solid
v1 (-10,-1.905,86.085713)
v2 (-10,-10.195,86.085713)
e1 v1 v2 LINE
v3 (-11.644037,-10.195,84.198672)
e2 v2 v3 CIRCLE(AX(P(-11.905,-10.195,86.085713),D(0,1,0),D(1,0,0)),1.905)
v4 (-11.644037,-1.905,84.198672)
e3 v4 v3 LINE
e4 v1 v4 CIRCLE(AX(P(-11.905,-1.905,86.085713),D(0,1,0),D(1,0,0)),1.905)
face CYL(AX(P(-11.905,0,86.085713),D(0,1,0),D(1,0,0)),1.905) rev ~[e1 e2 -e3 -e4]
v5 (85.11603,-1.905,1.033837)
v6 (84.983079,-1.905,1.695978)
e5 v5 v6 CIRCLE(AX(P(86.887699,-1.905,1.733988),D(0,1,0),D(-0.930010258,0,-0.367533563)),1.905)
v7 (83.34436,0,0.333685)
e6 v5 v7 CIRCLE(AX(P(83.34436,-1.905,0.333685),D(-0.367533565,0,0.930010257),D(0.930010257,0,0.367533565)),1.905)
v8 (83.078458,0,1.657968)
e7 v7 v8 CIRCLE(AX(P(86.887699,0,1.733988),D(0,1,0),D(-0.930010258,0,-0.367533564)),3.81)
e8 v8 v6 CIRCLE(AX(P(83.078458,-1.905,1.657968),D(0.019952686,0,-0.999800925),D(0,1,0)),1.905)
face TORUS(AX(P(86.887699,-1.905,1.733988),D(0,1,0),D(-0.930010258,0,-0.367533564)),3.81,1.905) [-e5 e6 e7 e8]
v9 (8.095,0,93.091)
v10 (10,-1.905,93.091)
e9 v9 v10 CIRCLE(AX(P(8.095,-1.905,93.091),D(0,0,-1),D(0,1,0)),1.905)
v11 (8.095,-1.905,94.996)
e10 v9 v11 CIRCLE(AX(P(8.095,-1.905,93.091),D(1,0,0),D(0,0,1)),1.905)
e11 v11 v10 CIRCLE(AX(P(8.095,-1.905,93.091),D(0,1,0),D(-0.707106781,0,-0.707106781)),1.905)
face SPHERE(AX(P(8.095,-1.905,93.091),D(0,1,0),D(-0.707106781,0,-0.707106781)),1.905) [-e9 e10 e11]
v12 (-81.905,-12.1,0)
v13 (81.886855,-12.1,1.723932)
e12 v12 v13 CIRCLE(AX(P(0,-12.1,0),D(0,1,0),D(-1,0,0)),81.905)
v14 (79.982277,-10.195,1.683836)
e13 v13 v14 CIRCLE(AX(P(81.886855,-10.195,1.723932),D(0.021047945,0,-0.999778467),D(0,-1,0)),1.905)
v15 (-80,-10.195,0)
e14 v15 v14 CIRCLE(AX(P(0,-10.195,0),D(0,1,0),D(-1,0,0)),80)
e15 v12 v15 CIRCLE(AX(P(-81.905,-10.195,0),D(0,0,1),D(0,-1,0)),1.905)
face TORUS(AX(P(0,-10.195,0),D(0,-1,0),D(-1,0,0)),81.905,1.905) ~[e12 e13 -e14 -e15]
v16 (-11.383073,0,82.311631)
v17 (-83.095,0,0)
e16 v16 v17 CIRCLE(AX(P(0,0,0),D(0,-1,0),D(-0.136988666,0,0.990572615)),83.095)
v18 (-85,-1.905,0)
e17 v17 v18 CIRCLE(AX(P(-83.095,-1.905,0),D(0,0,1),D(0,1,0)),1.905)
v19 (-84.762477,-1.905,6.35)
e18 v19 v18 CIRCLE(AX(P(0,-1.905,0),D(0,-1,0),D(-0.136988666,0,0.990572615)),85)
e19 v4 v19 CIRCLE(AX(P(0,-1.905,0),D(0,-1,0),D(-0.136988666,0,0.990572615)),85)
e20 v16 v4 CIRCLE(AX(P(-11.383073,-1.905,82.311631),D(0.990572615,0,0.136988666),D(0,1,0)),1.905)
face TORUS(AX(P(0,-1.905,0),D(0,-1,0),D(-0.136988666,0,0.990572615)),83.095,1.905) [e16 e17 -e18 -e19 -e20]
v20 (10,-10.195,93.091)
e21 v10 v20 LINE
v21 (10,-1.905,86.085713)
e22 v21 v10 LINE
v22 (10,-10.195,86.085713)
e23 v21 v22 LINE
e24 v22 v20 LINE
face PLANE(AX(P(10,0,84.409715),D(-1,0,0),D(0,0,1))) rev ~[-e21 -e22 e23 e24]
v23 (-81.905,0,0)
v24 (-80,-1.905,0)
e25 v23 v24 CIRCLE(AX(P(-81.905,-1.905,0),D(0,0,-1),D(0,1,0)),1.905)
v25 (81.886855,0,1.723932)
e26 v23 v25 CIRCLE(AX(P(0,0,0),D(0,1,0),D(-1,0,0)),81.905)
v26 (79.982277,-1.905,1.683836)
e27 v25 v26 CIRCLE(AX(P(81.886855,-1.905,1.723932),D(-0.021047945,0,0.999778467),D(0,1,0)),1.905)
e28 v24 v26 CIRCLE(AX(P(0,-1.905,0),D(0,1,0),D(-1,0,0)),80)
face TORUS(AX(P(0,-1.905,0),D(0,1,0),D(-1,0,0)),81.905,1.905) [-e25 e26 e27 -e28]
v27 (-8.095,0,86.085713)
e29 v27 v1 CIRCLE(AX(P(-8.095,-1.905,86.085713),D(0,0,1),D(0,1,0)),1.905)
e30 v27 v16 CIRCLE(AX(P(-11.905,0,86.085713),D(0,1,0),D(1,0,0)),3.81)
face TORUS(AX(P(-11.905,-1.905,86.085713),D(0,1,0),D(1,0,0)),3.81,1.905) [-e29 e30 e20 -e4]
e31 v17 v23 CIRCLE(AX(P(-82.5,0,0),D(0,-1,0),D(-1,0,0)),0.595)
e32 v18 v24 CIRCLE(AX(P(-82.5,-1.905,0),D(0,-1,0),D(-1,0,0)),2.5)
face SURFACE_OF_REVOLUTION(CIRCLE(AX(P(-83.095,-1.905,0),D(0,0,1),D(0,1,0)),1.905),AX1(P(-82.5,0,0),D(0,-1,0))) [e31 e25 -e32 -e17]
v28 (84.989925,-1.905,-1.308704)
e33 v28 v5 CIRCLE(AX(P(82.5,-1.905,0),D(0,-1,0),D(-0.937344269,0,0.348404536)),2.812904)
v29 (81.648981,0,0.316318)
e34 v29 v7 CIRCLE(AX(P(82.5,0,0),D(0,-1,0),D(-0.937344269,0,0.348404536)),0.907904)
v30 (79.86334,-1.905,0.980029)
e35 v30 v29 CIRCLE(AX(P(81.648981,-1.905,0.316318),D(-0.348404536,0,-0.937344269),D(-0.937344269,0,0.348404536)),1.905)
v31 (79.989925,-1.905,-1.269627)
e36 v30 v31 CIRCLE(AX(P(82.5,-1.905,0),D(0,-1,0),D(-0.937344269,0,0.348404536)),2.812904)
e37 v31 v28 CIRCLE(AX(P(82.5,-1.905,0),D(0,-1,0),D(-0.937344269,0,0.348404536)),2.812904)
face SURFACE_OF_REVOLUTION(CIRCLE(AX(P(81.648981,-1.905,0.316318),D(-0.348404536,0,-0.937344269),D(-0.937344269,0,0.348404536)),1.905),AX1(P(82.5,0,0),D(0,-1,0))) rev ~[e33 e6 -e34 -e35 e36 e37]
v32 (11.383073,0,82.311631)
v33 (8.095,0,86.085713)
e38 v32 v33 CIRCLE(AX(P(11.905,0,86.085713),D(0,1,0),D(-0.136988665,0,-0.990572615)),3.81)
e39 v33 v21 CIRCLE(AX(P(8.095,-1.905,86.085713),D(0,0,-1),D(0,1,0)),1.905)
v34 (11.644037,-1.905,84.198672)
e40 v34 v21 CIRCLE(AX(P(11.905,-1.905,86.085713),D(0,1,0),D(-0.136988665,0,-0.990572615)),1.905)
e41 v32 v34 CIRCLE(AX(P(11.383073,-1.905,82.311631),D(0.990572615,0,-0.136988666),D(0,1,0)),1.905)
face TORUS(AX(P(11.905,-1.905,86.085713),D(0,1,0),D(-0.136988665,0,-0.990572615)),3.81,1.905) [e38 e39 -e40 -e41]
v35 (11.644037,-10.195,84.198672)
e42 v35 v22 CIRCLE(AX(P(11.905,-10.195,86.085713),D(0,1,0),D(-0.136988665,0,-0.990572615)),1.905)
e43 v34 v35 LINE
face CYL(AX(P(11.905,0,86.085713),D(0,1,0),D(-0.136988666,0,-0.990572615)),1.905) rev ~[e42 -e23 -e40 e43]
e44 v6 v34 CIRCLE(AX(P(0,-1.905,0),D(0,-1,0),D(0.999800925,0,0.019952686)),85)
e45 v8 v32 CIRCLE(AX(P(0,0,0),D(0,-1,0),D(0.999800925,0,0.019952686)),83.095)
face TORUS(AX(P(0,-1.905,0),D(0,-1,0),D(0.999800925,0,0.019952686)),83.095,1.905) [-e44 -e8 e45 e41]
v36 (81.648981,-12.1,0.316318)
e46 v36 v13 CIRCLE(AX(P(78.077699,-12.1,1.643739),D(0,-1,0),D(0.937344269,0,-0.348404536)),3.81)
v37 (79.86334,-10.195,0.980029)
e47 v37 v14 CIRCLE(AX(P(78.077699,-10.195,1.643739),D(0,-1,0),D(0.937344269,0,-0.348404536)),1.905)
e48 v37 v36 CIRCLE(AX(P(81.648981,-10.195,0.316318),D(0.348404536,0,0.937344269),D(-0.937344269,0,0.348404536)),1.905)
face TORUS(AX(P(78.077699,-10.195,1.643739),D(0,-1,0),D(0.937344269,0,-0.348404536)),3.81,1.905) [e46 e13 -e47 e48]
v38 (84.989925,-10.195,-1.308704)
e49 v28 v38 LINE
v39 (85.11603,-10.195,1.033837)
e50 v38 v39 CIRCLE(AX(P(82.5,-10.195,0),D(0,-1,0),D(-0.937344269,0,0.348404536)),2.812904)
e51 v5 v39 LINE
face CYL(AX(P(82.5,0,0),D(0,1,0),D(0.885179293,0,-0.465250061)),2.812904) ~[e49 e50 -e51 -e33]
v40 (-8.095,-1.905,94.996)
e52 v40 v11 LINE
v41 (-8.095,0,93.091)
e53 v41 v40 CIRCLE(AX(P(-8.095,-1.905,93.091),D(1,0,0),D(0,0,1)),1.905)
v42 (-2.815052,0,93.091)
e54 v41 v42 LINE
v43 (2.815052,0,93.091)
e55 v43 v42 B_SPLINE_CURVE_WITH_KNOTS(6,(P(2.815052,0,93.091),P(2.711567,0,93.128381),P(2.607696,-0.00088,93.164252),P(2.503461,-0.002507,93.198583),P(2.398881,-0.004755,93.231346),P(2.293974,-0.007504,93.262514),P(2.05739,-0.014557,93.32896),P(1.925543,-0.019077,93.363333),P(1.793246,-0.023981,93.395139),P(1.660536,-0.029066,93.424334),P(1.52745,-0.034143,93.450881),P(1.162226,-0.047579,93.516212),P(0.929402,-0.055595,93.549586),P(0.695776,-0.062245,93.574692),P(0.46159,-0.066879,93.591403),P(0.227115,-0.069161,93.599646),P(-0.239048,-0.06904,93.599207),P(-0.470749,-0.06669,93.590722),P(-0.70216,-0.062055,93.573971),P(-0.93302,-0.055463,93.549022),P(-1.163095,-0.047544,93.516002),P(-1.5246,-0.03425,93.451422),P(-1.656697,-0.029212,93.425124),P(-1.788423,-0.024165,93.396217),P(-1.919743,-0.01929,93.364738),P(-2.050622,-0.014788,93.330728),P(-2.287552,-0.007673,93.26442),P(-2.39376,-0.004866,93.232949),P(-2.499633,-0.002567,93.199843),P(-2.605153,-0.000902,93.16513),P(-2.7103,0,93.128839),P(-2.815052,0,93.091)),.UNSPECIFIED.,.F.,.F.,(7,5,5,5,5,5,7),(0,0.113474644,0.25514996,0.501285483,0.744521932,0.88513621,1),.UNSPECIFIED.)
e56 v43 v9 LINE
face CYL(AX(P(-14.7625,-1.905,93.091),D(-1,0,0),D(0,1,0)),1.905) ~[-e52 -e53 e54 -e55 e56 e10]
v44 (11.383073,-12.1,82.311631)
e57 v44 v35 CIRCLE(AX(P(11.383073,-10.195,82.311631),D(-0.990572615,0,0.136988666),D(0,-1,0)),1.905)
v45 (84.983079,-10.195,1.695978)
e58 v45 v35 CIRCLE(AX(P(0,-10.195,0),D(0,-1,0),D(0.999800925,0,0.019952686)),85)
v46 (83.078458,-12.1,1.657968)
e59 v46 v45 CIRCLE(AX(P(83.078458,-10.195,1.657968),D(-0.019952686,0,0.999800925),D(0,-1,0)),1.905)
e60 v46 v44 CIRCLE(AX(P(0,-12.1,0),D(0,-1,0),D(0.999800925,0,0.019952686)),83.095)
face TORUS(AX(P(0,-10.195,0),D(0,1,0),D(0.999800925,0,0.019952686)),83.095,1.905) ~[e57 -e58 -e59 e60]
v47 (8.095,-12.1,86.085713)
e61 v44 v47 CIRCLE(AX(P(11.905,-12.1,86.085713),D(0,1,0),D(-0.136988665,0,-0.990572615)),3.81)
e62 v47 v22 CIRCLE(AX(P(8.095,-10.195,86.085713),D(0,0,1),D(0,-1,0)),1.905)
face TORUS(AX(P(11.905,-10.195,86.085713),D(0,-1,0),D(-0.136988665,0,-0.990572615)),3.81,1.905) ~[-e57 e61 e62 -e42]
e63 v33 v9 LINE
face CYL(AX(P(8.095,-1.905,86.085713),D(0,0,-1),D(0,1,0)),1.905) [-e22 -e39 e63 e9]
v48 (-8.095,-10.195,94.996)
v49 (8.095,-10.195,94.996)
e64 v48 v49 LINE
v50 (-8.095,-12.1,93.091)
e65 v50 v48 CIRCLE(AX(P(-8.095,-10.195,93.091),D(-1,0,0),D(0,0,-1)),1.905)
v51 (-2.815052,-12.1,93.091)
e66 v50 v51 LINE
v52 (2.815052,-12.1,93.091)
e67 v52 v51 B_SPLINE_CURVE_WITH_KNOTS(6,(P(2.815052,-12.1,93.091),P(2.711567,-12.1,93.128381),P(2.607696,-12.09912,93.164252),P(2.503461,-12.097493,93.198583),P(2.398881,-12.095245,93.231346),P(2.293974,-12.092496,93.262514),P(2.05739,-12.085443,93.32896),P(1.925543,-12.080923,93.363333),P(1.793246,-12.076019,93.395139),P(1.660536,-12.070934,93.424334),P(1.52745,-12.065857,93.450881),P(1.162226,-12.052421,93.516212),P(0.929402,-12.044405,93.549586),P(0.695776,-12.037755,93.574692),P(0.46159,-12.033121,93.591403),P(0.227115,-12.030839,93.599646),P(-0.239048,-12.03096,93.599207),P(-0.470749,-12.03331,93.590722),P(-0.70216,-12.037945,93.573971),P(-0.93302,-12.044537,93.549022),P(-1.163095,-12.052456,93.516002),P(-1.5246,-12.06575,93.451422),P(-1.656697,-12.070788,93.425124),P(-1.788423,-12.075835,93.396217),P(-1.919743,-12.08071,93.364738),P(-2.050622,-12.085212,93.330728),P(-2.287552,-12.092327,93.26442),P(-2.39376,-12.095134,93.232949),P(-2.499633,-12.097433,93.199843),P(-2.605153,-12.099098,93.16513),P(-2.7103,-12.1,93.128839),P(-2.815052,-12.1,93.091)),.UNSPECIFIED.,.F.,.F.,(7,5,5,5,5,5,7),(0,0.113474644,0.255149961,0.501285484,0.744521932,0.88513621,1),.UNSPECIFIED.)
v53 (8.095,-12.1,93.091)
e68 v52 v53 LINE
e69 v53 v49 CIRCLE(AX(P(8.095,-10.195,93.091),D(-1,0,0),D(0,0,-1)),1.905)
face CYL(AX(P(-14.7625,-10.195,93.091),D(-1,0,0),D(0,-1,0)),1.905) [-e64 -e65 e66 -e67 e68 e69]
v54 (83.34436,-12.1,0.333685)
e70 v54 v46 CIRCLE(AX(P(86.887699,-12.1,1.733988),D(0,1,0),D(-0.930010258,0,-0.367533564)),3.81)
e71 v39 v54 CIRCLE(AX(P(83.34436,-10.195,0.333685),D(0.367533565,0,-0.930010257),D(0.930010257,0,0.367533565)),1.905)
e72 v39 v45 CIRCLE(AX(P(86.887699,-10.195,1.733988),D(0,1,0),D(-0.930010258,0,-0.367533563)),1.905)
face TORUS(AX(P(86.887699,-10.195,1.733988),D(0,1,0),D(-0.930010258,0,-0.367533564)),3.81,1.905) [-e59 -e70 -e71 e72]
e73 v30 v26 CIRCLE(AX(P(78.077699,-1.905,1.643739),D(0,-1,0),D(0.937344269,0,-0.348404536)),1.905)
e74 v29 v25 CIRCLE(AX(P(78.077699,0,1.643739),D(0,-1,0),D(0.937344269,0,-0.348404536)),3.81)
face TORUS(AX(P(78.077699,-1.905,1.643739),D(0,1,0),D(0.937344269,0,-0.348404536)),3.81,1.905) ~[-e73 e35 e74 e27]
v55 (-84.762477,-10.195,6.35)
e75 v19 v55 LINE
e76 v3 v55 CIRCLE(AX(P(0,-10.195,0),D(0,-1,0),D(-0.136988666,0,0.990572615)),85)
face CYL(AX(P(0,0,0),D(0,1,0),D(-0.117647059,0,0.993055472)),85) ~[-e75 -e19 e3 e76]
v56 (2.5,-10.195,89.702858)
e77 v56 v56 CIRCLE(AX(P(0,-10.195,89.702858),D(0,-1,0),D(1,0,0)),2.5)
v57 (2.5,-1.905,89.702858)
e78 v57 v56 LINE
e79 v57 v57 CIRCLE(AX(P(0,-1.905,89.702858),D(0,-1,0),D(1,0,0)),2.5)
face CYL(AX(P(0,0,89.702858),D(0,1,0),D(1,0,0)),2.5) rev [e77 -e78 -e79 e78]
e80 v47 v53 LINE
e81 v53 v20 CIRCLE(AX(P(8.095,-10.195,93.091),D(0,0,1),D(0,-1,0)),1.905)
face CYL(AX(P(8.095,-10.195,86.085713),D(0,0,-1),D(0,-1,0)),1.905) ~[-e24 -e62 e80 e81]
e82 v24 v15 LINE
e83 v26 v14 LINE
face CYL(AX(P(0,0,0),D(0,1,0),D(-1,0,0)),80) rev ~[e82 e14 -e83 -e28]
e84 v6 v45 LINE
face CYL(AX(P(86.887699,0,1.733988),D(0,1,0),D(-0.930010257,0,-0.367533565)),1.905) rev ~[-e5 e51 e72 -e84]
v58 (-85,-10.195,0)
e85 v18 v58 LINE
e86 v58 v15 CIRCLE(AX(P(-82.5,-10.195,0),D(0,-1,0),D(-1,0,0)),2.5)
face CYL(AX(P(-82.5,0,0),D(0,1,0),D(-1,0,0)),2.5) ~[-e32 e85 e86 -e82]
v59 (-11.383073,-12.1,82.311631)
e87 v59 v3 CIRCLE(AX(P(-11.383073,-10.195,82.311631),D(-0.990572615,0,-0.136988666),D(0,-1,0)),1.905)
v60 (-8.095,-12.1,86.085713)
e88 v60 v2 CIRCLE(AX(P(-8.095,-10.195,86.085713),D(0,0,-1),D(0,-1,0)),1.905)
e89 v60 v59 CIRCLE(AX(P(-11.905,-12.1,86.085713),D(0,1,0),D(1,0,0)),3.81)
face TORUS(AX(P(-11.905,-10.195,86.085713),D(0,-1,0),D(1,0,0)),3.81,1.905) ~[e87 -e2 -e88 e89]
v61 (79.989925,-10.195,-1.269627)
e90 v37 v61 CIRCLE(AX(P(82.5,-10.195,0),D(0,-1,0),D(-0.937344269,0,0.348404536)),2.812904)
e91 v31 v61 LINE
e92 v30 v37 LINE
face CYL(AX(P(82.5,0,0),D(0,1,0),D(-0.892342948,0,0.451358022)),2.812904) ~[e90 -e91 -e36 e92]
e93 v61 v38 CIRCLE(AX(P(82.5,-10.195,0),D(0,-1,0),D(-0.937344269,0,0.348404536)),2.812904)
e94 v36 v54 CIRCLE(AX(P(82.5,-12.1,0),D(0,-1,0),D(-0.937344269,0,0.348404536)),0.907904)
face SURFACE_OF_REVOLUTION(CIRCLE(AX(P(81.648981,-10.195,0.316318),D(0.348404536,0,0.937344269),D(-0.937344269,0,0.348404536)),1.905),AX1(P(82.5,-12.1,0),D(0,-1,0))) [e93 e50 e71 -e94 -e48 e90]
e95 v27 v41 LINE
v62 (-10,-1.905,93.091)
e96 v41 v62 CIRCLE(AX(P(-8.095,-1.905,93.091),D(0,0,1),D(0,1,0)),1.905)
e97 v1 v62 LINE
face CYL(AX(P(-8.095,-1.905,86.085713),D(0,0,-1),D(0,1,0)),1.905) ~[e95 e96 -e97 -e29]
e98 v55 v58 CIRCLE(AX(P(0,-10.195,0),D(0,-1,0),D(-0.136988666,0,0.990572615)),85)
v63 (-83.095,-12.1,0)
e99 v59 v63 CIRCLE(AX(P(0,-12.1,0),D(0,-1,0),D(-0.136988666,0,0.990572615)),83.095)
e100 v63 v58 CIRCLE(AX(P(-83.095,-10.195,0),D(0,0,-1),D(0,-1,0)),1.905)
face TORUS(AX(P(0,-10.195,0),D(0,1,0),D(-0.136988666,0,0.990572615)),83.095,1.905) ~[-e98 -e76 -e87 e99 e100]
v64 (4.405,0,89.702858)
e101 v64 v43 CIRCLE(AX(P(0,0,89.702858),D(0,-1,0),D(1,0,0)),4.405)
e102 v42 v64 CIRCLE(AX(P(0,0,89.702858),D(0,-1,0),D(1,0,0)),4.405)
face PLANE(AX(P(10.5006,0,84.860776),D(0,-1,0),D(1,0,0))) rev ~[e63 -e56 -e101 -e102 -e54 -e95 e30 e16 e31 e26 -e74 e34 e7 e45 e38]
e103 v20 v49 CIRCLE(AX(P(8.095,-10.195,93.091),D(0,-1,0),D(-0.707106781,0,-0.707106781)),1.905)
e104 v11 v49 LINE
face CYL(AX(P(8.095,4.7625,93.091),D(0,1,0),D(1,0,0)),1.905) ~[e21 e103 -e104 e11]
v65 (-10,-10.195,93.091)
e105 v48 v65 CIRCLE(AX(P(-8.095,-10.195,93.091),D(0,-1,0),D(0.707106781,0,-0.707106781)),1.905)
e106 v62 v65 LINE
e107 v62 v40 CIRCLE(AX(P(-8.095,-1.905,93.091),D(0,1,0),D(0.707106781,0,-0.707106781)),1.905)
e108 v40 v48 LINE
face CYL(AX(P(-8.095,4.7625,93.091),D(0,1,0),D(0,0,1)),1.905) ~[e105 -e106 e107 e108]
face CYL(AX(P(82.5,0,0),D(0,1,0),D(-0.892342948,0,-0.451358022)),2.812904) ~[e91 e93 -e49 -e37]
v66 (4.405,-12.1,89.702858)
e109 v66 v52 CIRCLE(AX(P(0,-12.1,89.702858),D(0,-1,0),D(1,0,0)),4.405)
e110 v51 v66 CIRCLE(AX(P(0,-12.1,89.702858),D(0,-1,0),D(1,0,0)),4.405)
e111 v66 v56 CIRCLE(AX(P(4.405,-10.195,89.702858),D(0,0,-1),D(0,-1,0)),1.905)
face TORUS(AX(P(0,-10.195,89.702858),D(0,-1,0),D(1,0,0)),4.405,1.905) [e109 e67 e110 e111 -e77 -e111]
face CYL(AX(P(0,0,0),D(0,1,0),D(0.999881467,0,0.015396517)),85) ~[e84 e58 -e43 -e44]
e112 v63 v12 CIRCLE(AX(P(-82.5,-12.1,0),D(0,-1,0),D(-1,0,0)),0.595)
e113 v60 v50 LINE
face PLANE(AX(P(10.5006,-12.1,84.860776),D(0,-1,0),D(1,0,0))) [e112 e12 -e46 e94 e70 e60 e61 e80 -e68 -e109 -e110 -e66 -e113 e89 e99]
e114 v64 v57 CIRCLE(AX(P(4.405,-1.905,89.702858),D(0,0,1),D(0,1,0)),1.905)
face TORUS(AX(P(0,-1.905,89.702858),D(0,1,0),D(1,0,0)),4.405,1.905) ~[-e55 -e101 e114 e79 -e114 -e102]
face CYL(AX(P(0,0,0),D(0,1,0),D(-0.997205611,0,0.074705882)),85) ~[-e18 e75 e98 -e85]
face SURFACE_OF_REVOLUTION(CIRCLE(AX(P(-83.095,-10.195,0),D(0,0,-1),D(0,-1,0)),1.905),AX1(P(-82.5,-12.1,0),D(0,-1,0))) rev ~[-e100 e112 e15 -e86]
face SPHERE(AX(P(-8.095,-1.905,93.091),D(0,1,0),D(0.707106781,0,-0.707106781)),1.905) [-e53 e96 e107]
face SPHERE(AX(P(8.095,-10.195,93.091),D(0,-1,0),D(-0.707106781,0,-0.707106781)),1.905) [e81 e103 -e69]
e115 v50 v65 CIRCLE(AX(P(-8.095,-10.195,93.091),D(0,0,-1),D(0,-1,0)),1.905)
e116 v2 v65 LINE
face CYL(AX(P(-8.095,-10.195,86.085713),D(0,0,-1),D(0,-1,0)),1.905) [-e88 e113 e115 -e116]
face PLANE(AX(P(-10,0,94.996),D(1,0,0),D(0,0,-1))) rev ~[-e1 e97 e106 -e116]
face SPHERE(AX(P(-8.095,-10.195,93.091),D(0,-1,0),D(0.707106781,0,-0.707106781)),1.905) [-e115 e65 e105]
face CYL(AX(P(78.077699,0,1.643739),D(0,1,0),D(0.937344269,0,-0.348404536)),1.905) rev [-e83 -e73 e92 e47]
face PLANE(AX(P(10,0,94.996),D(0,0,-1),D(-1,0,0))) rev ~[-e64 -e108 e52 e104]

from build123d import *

# Parameters (mm, degrees)
F0_R         = 2.5
F1_DEPTH     = 12.1
F2_T1_DEPTH  = 12.1
F2_T3_DEPTH  = 21.625
F2_T5_DEPTH  = 29.525
F2_T11_DEPTH = 7.0052868996
F2_S15_W     = 1.905
F2_S15_H     = 1.905
F2_T16_DEPTH = 1.905
F2_S21_W     = 1.905
F2_S21_H     = 1.905
F2_T22_DEPTH = 1.905
F2_S27_W     = 1.905
F2_S27_H     = 1.905
F2_T28_DEPTH = 1.905
F2_S33_W     = 1.905
F2_S33_H     = 1.905
F2_T34_DEPTH = 1.905
F2_T38_ANGLE = 82.1263694415
F2_T40_ANGLE = 221.9533464531
F2_T42_ANGLE = 221.9533464531
F2_T44_ANGLE = 80.9830888649
F2_T46_ANGLE = 178.7939525204
F2_T48_ANGLE = 82.1263694415
F2_T50_ANGLE = 180
F2_T52_ANGLE = 180
F2_T54_ANGLE = 80.9830888649
F2_T56_ANGLE = 178.7939525204
F2_T58_ANGLE = 21.5958079127
F2_T60_ANGLE = 20.4203054434
F2_T62_ANGLE = 82.1263694415
F2_T64_ANGLE = 82.1263694415
F2_T66_ANGLE = 82.1263694415
F2_T68_ANGLE = 21.5958079127
F2_T70_ANGLE = 20.4203054434
F2_T72_ANGLE = 82.1263694415


# Not quite as in the source:
# - a fillet or chamfer that OpenCascade refuses, or shapes differently, is made with other operations: its cross-section is extruded or revolved along the edge and cut away or added


with BuildPart() as f1:
    # F0 (on Front) → F1 (new body)
    with BuildSketch(Plane.XZ):
        with BuildLine():
            ThreePointArc((79.9899246621, 1.2696269321), (79.6870956738, 0), (79.9899246621, -1.2696269321))
            ThreePointArc((79.9899246621, -1.2696269321), (80, 0), (79.9899246621, 1.2696269321))
        make_face()
        with BuildLine():
            ThreePointArc((84.9899246621, 1.3087039105), (85, 0), (84.9899246621, -1.3087039105))
            ThreePointArc((84.9899246621, -1.3087039105), (85.3129043262, 0), (84.9899246621, 1.3087039105))
        make_face()
        with BuildLine():
            ThreePointArc((79.9899246621, 1.2696269321), (80, 0), (79.9899246621, -1.2696269321))
            ThreePointArc((79.9899246621, -1.2696269321), (82.478016711, -2.8128184235), (84.9899246621, -1.3087039105))
            ThreePointArc((84.9899246621, -1.3087039105), (85, 0), (84.9899246621, 1.3087039105))
            ThreePointArc((84.9899246621, 1.3087039105), (63.1048014117, 56.9454479199), (10, 84.4097150807))
            Line((10, 84.4097150807), (10, 94.996))
            Line((10, 94.996), (-10, 94.996))
            Line((-10, 94.996), (-10, 84.4097150807))
            ThreePointArc((-10, 84.4097150807), (-61.386574586, 58.7936090115), (-84.7624769577, 6.35))
            ThreePointArc((-84.7624769577, 6.35), (-84.9405984833, 3.177220373), (-85, 0))
            ThreePointArc((-85, 0), (-82.5, -2.5), (-80, 0))
            ThreePointArc((-80, 0), (-0.6348334544, 79.9974811259), (79.9899246621, 1.2696269321))
        make_face()
        with Locations((0, 89.7028575403)):
            Circle(F0_R, mode=Mode.SUBTRACT)
    extrude(amount=F1_DEPTH)

    # F2: fillet of radius 1.905 on 27 edges, made by hand

    # F2_s2 → F2_t1 (join)
    with BuildSketch(Plane.XZ):
        with BuildLine():
            ThreePointArc((11.6440365917, 84.1986722689), (10.4686573715, 84.8343359176), (10, 86.0857131004))
            Line((10, 86.0857131004), (10, 84.4097150807))
            ThreePointArc((10, 84.4097150807), (10.8225327333, 84.3082011742), (11.6440365917, 84.1986722689))
        make_face()
        with BuildLine():
            ThreePointArc((79.8633402498, 0.9800286271), (79.9560670028, 1.3263117777), (79.9822773973, 1.6838356039))
            ThreePointArc((79.9822773973, 1.6838356039), (79.9863691521, 1.4767362182), (79.9899246621, 1.2696269321))
            ThreePointArc((79.9899246621, 1.2696269321), (79.9225618705, 1.1266070465), (79.8633402498, 0.9800286271))
        make_face()
        with BuildLine():
            ThreePointArc((85.1160298765, 1.0338367541), (85.0199774182, 1.3589688139), (84.983078654, 1.6959783275))
            ThreePointArc((84.983078654, 1.6959783275), (84.9867222538, 1.5023450186), (84.9899246621, 1.3087039105))
            ThreePointArc((84.9899246621, 1.3087039105), (85.0566738012, 1.1729662496), (85.1160298765, 1.0338367541))
        make_face()
        with BuildLine():
            ThreePointArc((-10, 86.0857131004), (-10.4686573715, 84.8343359176), (-11.6440365917, 84.1986722689))
            ThreePointArc((-11.6440365917, 84.1986722689), (-10.8225327333, 84.3082011742), (-10, 84.4097150807))
            Line((-10, 84.4097150807), (-10, 86.0857131004))
        make_face()
    extrude(amount=F2_T1_DEPTH)

    # F2_s4 → F2_t3 (cut)
    with BuildSketch(Plane.XZ.offset(-4.7625)):
        with BuildLine():
            ThreePointArc((10, 93.091), (9.4420384182, 94.4380384182), (8.095, 94.996))
            Line((8.095, 94.996), (10, 94.996))
            Line((10, 94.996), (10, 93.091))
        make_face()
        with BuildLine():
            ThreePointArc((-8.095, 94.996), (-9.4420384182, 94.4380384182), (-10, 93.091))
            Line((-10, 93.091), (-10, 94.996))
            Line((-10, 94.996), (-8.095, 94.996))
        make_face()
    extrude(amount=F2_T3_DEPTH, mode=Mode.SUBTRACT)

    # F2_s6 → F2_t5 (cut)
    with BuildSketch(Plane.YZ.offset(-14.7625)):
        with BuildLine():
            ThreePointArc((0, 93.091), (-0.5579615818, 94.4380384182), (-1.905, 94.996))
            Line((-1.905, 94.996), (0, 94.996))
            Line((0, 94.996), (0, 93.091))
        make_face()
        with BuildLine():
            ThreePointArc((-12.1, 93.091), (-11.5420384182, 94.4380384182), (-10.195, 94.996))
            Line((-10.195, 94.996), (-12.1, 94.996))
            Line((-12.1, 94.996), (-12.1, 93.091))
        make_face()
    extrude(amount=F2_T5_DEPTH, mode=Mode.SUBTRACT)

    # F2_s7 → F2_t8 (revolve, cut)
    with BuildSketch(Plane.XY.offset(89.7028575403)):
        with BuildLine():
            ThreePointArc((4.405, -12.1), (3.0579615818, -11.5420384182), (2.5, -10.195))
            Line((2.5, -10.195), (2.5, -12.1))
            Line((2.5, -12.1), (4.405, -12.1))
        make_face()
    revolve(axis=Axis((0, -12.1, 89.7028575403), (0, -1, 0)), mode=Mode.SUBTRACT)

    # F2_s9 → F2_t10 (revolve, cut)
    with BuildSketch(Plane.XY.offset(89.7028575403)):
        with BuildLine():
            ThreePointArc((4.405, 0), (3.0579615818, -0.5579615818), (2.5, -1.905))
            Line((2.5, -1.905), (2.5, 0))
            Line((2.5, 0), (4.405, 0))
        make_face()
    revolve(axis=Axis((0, 0, 89.7028575403), (0, -1, 0)), mode=Mode.SUBTRACT)

    # F2_s12 → F2_t11 (cut)
    with BuildSketch(Plane.XY.offset(86.0857131004)):
        with BuildLine():
            ThreePointArc((8.095, 0), (9.4420384182, -0.5579615818), (10, -1.905))
            Line((10, -1.905), (10, 0))
            Line((10, 0), (8.095, 0))
        make_face()
        with BuildLine():
            ThreePointArc((8.095, -12.1), (9.4420384182, -11.5420384182), (10, -10.195))
            Line((10, -10.195), (10, -12.1))
            Line((10, -12.1), (8.095, -12.1))
        make_face()
        with BuildLine():
            ThreePointArc((-8.095, 0), (-9.4420384182, -0.5579615818), (-10, -1.905))
            Line((-10, -1.905), (-10, 0))
            Line((-10, 0), (-8.095, 0))
        make_face()
        with BuildLine():
            ThreePointArc((-8.095, -12.1), (-9.4420384182, -11.5420384182), (-10, -10.195))
            Line((-10, -10.195), (-10, -12.1))
            Line((-10, -12.1), (-8.095, -12.1))
        make_face()
    extrude(amount=F2_T11_DEPTH, mode=Mode.SUBTRACT)


with BuildPart() as f2_tool14:
    # F2_s15 → F2_t16 (new body)
    with BuildSketch(Plane.XZ.offset(10.195)):
        with Locations((-9.0475, 94.0435)):
            Rectangle(F2_S15_W, F2_S15_H)
    extrude(amount=F2_T16_DEPTH)

    # F2_s17 → F2_t18 (revolve, cut)
    with BuildSketch(Plane(origin=(-8.095, -10.195, 93.091), x_dir=(0.7071067812, 0, -0.7071067812), z_dir=(-0.7071067812, 0, -0.7071067812))):
        with BuildLine():
            ThreePointArc((0, -1.905), (1.905, 0), (0, 1.905))
            Line((0, 1.905), (0, -1.905))
        make_face()
    revolve(axis=Axis((-8.095, -10.195, 93.091), (0, -1, 0)), mode=Mode.SUBTRACT)


with BuildPart() as f1_1:
    add(f1.part)

    # F2_t13: cut F2_tool14
    add(f2_tool14.part, mode=Mode.SUBTRACT)


with BuildPart() as f2_tool20:
    # F2_s21 → F2_t22 (new body)
    with BuildSketch(Plane.XZ.offset(1.905)):
        with Locations((-9.0475, 94.0435)):
            Rectangle(F2_S21_W, F2_S21_H)
    extrude(amount=-F2_T22_DEPTH)

    # F2_s23 → F2_t24 (revolve, cut)
    with BuildSketch(Plane(origin=(-8.095, -1.905, 93.091), x_dir=(0.7071067812, 0, -0.7071067812), z_dir=(0.7071067812, 0, 0.7071067812))):
        with BuildLine():
            ThreePointArc((0, -1.905), (1.905, 0), (0, 1.905))
            Line((0, 1.905), (0, -1.905))
        make_face()
    revolve(axis=Axis((-8.095, -1.905, 93.091), (0, 1, 0)), mode=Mode.SUBTRACT)


with BuildPart() as f1_2:
    add(f1_1.part)

    # F2_t19: cut F2_tool20
    add(f2_tool20.part, mode=Mode.SUBTRACT)


with BuildPart() as f2_tool26:
    # F2_s27 → F2_t28 (new body)
    with BuildSketch(Plane.XZ.offset(10.195)):
        with Locations((9.0475, 94.0435)):
            Rectangle(F2_S27_W, F2_S27_H)
    extrude(amount=F2_T28_DEPTH)

    # F2_s29 → F2_t30 (revolve, cut)
    with BuildSketch(Plane(origin=(8.095, -10.195, 93.091), x_dir=(-0.7071067812, 0, -0.7071067812), z_dir=(-0.7071067812, 0, 0.7071067812))):
        with BuildLine():
            ThreePointArc((0, -1.905), (1.905, 0), (0, 1.905))
            Line((0, 1.905), (0, -1.905))
        make_face()
    revolve(axis=Axis((8.095, -10.195, 93.091), (0, -1, 0)), mode=Mode.SUBTRACT)


with BuildPart() as f1_3:
    add(f1_2.part)

    # F2_t25: cut F2_tool26
    add(f2_tool26.part, mode=Mode.SUBTRACT)


with BuildPart() as f2_tool32:
    # F2_s33 → F2_t34 (new body)
    with BuildSketch(Plane.XZ.offset(1.905)):
        with Locations((9.0475, 94.0435)):
            Rectangle(F2_S33_W, F2_S33_H)
    extrude(amount=-F2_T34_DEPTH)

    # F2_s35 → F2_t36 (revolve, cut)
    with BuildSketch(Plane(origin=(8.095, -1.905, 93.091), x_dir=(-0.7071067812, 0, -0.7071067812), z_dir=(0.7071067812, 0, -0.7071067812))):
        with BuildLine():
            ThreePointArc((0, -1.905), (1.905, 0), (0, 1.905))
            Line((0, 1.905), (0, -1.905))
        make_face()
    revolve(axis=Axis((8.095, -1.905, 93.091), (0, 1, 0)), mode=Mode.SUBTRACT)


with BuildPart() as f1_4:
    add(f1_3.part)

    # F2_t31: cut F2_tool32
    add(f2_tool32.part, mode=Mode.SUBTRACT)

    # F2_s37 → F2_t38 (revolve, cut)
    with BuildSketch(Plane(origin=(0, 0, 0), x_dir=(0, 1, 0), z_dir=(0.9905726149, 0, 0.1369886658))):
        with BuildLine():
            ThreePointArc((-12.1, 83.095), (-11.5420384182, 84.4420384182), (-10.195, 85))
            Line((-10.195, 85), (-12.1, 85))
            Line((-12.1, 85), (-12.1, 83.095))
        make_face()
    revolve(axis=Axis((0, -12.1, 0), (0, -1, 0)), revolution_arc=F2_T38_ANGLE, mode=Mode.SUBTRACT)

    # F2_s39 → F2_t40 (revolve, cut)
    with BuildSketch(Plane(origin=(10.0143219694, 0, 26.9424371201), x_dir=(0, 1, 0), z_dir=(0.3484045362, 0, 0.9373442693))):
        with BuildLine():
            ThreePointArc((-1.905, -74.5179978897), (-0.5579615818, -75.0759594715), (0, -76.4229978897))
            Line((0, -76.4229978897), (0, -74.5179978897))
            Line((0, -74.5179978897), (-1.905, -74.5179978897))
        make_face()
    revolve(axis=Axis((82.5, 0, 0), (0, -1, 0)), revolution_arc=F2_T40_ANGLE, mode=Mode.SUBTRACT)

    # F2_s41 → F2_t42 (revolve, cut)
    with BuildSketch(Plane(origin=(10.0143219694, 0, 26.9424371201), x_dir=(0, 1, 0), z_dir=(0.3484045362, 0, 0.9373442693))):
        with BuildLine():
            ThreePointArc((-10.195, -74.5179978897), (-11.5420384182, -75.0759594715), (-12.1, -76.4229978897))
            Line((-12.1, -76.4229978897), (-12.1, -74.5179978897))
            Line((-12.1, -74.5179978897), (-10.195, -74.5179978897))
        make_face()
    revolve(axis=Axis((82.5, -12.1, 0), (0, -1, 0)), revolution_arc=F2_T42_ANGLE, mode=Mode.SUBTRACT)

    # F2_s43 → F2_t44 (revolve, cut)
    with BuildSketch(Plane(origin=(0, 0, 0), x_dir=(0, 1, 0), z_dir=(0.0199526862, 0, -0.9998009253))):
        with BuildLine():
            ThreePointArc((-12.1, 83.095), (-11.5420384182, 84.4420384182), (-10.195, 85))
            Line((-10.195, 85), (-12.1, 85))
            Line((-12.1, 85), (-12.1, 83.095))
        make_face()
    revolve(axis=Axis((0, -12.1, 0), (0, -1, 0)), revolution_arc=F2_T44_ANGLE, mode=Mode.SUBTRACT)

    # F2_s45 → F2_t46 (revolve, cut)
    with BuildSketch(Plane.XY):
        with BuildLine():
            ThreePointArc((-81.905, -12.1), (-80.5579615818, -11.5420384182), (-80, -10.195))
            Line((-80, -10.195), (-80, -12.1))
            Line((-80, -12.1), (-81.905, -12.1))
        make_face()
    revolve(axis=Axis((0, -12.1, 0), (0, 1, 0)), revolution_arc=F2_T46_ANGLE, mode=Mode.SUBTRACT)

    # F2_s47 → F2_t48 (revolve, cut)
    with BuildSketch(Plane(origin=(0, 0, 0), x_dir=(0, 1, 0), z_dir=(0.9905726149, 0, 0.1369886658))):
        with BuildLine():
            ThreePointArc((0, 83.095), (-0.5579615818, 84.4420384182), (-1.905, 85))
            Line((-1.905, 85), (0, 85))
            Line((0, 85), (0, 83.095))
        make_face()
    revolve(axis=Axis((0, 0, 0), (0, -1, 0)), revolution_arc=F2_T48_ANGLE, mode=Mode.SUBTRACT)

    # F2_s49 → F2_t50 (revolve, cut)
    with BuildSketch(Plane.XY):
        with BuildLine():
            ThreePointArc((-83.095, 0), (-84.4420384182, -0.5579615818), (-85, -1.905))
            Line((-85, -1.905), (-85, 0))
            Line((-85, 0), (-83.095, 0))
        make_face()
    revolve(axis=Axis((-82.5, 0, 0), (0, -1, 0)), revolution_arc=F2_T50_ANGLE, mode=Mode.SUBTRACT)

    # F2_s51 → F2_t52 (revolve, cut)
    with BuildSketch(Plane.XY):
        with BuildLine():
            ThreePointArc((-83.095, -12.1), (-84.4420384182, -11.5420384182), (-85, -10.195))
            Line((-85, -10.195), (-85, -12.1))
            Line((-85, -12.1), (-83.095, -12.1))
        make_face()
    revolve(axis=Axis((-82.5, -12.1, 0), (0, -1, 0)), revolution_arc=F2_T52_ANGLE, mode=Mode.SUBTRACT)

    # F2_s53 → F2_t54 (revolve, cut)
    with BuildSketch(Plane(origin=(0, 0, 0), x_dir=(0, 1, 0), z_dir=(0.0199526862, 0, -0.9998009253))):
        with BuildLine():
            ThreePointArc((0, 83.095), (-0.5579615818, 84.4420384182), (-1.905, 85))
            Line((-1.905, 85), (0, 85))
            Line((0, 85), (0, 83.095))
        make_face()
    revolve(axis=Axis((0, 0, 0), (0, -1, 0)), revolution_arc=F2_T54_ANGLE, mode=Mode.SUBTRACT)

    # F2_s55 → F2_t56 (revolve, cut)
    with BuildSketch(Plane.XY):
        with BuildLine():
            ThreePointArc((-81.905, 0), (-80.5579615818, -0.5579615818), (-80, -1.905))
            Line((-80, -1.905), (-80, 0))
            Line((-80, 0), (-81.905, 0))
        make_face()
    revolve(axis=Axis((0, 0, 0), (0, 1, 0)), revolution_arc=F2_T56_ANGLE, mode=Mode.SUBTRACT)

    # F2_s57 → F2_t58 (revolve, cut)
    with BuildSketch(Plane(origin=(10.0143219694, 0, 26.9424371201), x_dir=(0, 1, 0), z_dir=(-0.3484045362, 0, -0.9373442693))):
        with BuildLine():
            ThreePointArc((0, 76.4229978897), (-0.5579615818, 75.0759594715), (-1.905, 74.5179978897))
            Line((-1.905, 74.5179978897), (0, 74.5179978897))
            Line((0, 74.5179978897), (0, 76.4229978897))
        make_face()
    revolve(axis=Axis((78.0776994168, 0, 1.6437392686), (0, -1, 0)), revolution_arc=F2_T58_ANGLE, mode=Mode.SUBTRACT)

    # F2_s59 → F2_t60 (revolve, cut)
    with BuildSketch(Plane(origin=(11.1441759948, 0, -28.199323768), x_dir=(0, 1, 0), z_dir=(0.3675335647, 0, -0.9300102574))):
        with BuildLine():
            ThreePointArc((0, 77.6337505609), (-0.5579615818, 78.9807889791), (-1.905, 79.5387505609))
            Line((-1.905, 79.5387505609), (0, 79.5387505609))
            Line((0, 79.5387505609), (0, 77.6337505609))
        make_face()
    revolve(axis=Axis((86.8876994168, 0, 1.7339881947), (0, 1, 0)), revolution_arc=F2_T60_ANGLE, mode=Mode.SUBTRACT)

    # F2_s61 → F2_t62 (revolve, cut)
    with BuildSketch(Plane(origin=(0, 0, 0), x_dir=(0, 1, 0), z_dir=(0.9905726149, 0, -0.1369886658))):
        with BuildLine():
            ThreePointArc((0, 83.095), (-0.5579615818, 84.4420384182), (-1.905, 85))
            Line((-1.905, 85), (0, 85))
            Line((0, 85), (0, 83.095))
        make_face()
    revolve(axis=Axis((11.905, 0, 86.0857131004), (0, 1, 0)), revolution_arc=F2_T62_ANGLE, mode=Mode.SUBTRACT)

    # F2_s63 → F2_t64 (revolve, cut)
    with BuildSketch(Plane.XY.offset(86.0857131004)):
        with BuildLine():
            ThreePointArc((-8.095, -12.1), (-9.4420384182, -11.5420384182), (-10, -10.195))
            Line((-10, -10.195), (-10, -12.1))
            Line((-10, -12.1), (-8.095, -12.1))
        make_face()
    revolve(axis=Axis((-11.905, -12.1, 86.0857131004), (0, 1, 0)), revolution_arc=F2_T64_ANGLE, mode=Mode.SUBTRACT)

    # F2_s65 → F2_t66 (revolve, cut)
    with BuildSketch(Plane.XY.offset(86.0857131004)):
        with BuildLine():
            ThreePointArc((-8.095, 0), (-9.4420384182, -0.5579615818), (-10, -1.905))
            Line((-10, -1.905), (-10, 0))
            Line((-10, 0), (-8.095, 0))
        make_face()
    revolve(axis=Axis((-11.905, 0, 86.0857131004), (0, 1, 0)), revolution_arc=F2_T66_ANGLE, mode=Mode.SUBTRACT)

    # F2_s67 → F2_t68 (revolve, cut)
    with BuildSketch(Plane(origin=(10.0143219694, 0, 26.9424371201), x_dir=(0, 1, 0), z_dir=(-0.3484045362, 0, -0.9373442693))):
        with BuildLine():
            ThreePointArc((-12.1, 76.4229978897), (-11.5420384182, 75.0759594715), (-10.195, 74.5179978897))
            Line((-10.195, 74.5179978897), (-12.1, 74.5179978897))
            Line((-12.1, 74.5179978897), (-12.1, 76.4229978897))
        make_face()
    revolve(axis=Axis((78.0776994168, -12.1, 1.6437392686), (0, -1, 0)), revolution_arc=F2_T68_ANGLE, mode=Mode.SUBTRACT)

    # F2_s69 → F2_t70 (revolve, cut)
    with BuildSketch(Plane(origin=(11.1441759948, 0, -28.199323768), x_dir=(0, 1, 0), z_dir=(0.3675335647, 0, -0.9300102574))):
        with BuildLine():
            ThreePointArc((-10.195, 79.5387505609), (-11.5420384182, 78.9807889791), (-12.1, 77.6337505609))
            Line((-12.1, 77.6337505609), (-12.1, 79.5387505609))
            Line((-12.1, 79.5387505609), (-10.195, 79.5387505609))
        make_face()
    revolve(axis=Axis((86.8876994168, -12.1, 1.7339881947), (0, 1, 0)), revolution_arc=F2_T70_ANGLE, mode=Mode.SUBTRACT)

    # F2_s71 → F2_t72 (revolve, cut)
    with BuildSketch(Plane(origin=(0, 0, 0), x_dir=(0, 1, 0), z_dir=(0.9905726149, 0, -0.1369886658))):
        with BuildLine():
            ThreePointArc((-12.1, 83.095), (-11.5420384182, 84.4420384182), (-10.195, 85))
            Line((-10.195, 85), (-12.1, 85))
            Line((-12.1, 85), (-12.1, 83.095))
        make_face()
    revolve(axis=Axis((11.905, -12.1, 86.0857131004), (0, 1, 0)), revolution_arc=F2_T72_ANGLE, mode=Mode.SUBTRACT)


solid = f1_4.part
